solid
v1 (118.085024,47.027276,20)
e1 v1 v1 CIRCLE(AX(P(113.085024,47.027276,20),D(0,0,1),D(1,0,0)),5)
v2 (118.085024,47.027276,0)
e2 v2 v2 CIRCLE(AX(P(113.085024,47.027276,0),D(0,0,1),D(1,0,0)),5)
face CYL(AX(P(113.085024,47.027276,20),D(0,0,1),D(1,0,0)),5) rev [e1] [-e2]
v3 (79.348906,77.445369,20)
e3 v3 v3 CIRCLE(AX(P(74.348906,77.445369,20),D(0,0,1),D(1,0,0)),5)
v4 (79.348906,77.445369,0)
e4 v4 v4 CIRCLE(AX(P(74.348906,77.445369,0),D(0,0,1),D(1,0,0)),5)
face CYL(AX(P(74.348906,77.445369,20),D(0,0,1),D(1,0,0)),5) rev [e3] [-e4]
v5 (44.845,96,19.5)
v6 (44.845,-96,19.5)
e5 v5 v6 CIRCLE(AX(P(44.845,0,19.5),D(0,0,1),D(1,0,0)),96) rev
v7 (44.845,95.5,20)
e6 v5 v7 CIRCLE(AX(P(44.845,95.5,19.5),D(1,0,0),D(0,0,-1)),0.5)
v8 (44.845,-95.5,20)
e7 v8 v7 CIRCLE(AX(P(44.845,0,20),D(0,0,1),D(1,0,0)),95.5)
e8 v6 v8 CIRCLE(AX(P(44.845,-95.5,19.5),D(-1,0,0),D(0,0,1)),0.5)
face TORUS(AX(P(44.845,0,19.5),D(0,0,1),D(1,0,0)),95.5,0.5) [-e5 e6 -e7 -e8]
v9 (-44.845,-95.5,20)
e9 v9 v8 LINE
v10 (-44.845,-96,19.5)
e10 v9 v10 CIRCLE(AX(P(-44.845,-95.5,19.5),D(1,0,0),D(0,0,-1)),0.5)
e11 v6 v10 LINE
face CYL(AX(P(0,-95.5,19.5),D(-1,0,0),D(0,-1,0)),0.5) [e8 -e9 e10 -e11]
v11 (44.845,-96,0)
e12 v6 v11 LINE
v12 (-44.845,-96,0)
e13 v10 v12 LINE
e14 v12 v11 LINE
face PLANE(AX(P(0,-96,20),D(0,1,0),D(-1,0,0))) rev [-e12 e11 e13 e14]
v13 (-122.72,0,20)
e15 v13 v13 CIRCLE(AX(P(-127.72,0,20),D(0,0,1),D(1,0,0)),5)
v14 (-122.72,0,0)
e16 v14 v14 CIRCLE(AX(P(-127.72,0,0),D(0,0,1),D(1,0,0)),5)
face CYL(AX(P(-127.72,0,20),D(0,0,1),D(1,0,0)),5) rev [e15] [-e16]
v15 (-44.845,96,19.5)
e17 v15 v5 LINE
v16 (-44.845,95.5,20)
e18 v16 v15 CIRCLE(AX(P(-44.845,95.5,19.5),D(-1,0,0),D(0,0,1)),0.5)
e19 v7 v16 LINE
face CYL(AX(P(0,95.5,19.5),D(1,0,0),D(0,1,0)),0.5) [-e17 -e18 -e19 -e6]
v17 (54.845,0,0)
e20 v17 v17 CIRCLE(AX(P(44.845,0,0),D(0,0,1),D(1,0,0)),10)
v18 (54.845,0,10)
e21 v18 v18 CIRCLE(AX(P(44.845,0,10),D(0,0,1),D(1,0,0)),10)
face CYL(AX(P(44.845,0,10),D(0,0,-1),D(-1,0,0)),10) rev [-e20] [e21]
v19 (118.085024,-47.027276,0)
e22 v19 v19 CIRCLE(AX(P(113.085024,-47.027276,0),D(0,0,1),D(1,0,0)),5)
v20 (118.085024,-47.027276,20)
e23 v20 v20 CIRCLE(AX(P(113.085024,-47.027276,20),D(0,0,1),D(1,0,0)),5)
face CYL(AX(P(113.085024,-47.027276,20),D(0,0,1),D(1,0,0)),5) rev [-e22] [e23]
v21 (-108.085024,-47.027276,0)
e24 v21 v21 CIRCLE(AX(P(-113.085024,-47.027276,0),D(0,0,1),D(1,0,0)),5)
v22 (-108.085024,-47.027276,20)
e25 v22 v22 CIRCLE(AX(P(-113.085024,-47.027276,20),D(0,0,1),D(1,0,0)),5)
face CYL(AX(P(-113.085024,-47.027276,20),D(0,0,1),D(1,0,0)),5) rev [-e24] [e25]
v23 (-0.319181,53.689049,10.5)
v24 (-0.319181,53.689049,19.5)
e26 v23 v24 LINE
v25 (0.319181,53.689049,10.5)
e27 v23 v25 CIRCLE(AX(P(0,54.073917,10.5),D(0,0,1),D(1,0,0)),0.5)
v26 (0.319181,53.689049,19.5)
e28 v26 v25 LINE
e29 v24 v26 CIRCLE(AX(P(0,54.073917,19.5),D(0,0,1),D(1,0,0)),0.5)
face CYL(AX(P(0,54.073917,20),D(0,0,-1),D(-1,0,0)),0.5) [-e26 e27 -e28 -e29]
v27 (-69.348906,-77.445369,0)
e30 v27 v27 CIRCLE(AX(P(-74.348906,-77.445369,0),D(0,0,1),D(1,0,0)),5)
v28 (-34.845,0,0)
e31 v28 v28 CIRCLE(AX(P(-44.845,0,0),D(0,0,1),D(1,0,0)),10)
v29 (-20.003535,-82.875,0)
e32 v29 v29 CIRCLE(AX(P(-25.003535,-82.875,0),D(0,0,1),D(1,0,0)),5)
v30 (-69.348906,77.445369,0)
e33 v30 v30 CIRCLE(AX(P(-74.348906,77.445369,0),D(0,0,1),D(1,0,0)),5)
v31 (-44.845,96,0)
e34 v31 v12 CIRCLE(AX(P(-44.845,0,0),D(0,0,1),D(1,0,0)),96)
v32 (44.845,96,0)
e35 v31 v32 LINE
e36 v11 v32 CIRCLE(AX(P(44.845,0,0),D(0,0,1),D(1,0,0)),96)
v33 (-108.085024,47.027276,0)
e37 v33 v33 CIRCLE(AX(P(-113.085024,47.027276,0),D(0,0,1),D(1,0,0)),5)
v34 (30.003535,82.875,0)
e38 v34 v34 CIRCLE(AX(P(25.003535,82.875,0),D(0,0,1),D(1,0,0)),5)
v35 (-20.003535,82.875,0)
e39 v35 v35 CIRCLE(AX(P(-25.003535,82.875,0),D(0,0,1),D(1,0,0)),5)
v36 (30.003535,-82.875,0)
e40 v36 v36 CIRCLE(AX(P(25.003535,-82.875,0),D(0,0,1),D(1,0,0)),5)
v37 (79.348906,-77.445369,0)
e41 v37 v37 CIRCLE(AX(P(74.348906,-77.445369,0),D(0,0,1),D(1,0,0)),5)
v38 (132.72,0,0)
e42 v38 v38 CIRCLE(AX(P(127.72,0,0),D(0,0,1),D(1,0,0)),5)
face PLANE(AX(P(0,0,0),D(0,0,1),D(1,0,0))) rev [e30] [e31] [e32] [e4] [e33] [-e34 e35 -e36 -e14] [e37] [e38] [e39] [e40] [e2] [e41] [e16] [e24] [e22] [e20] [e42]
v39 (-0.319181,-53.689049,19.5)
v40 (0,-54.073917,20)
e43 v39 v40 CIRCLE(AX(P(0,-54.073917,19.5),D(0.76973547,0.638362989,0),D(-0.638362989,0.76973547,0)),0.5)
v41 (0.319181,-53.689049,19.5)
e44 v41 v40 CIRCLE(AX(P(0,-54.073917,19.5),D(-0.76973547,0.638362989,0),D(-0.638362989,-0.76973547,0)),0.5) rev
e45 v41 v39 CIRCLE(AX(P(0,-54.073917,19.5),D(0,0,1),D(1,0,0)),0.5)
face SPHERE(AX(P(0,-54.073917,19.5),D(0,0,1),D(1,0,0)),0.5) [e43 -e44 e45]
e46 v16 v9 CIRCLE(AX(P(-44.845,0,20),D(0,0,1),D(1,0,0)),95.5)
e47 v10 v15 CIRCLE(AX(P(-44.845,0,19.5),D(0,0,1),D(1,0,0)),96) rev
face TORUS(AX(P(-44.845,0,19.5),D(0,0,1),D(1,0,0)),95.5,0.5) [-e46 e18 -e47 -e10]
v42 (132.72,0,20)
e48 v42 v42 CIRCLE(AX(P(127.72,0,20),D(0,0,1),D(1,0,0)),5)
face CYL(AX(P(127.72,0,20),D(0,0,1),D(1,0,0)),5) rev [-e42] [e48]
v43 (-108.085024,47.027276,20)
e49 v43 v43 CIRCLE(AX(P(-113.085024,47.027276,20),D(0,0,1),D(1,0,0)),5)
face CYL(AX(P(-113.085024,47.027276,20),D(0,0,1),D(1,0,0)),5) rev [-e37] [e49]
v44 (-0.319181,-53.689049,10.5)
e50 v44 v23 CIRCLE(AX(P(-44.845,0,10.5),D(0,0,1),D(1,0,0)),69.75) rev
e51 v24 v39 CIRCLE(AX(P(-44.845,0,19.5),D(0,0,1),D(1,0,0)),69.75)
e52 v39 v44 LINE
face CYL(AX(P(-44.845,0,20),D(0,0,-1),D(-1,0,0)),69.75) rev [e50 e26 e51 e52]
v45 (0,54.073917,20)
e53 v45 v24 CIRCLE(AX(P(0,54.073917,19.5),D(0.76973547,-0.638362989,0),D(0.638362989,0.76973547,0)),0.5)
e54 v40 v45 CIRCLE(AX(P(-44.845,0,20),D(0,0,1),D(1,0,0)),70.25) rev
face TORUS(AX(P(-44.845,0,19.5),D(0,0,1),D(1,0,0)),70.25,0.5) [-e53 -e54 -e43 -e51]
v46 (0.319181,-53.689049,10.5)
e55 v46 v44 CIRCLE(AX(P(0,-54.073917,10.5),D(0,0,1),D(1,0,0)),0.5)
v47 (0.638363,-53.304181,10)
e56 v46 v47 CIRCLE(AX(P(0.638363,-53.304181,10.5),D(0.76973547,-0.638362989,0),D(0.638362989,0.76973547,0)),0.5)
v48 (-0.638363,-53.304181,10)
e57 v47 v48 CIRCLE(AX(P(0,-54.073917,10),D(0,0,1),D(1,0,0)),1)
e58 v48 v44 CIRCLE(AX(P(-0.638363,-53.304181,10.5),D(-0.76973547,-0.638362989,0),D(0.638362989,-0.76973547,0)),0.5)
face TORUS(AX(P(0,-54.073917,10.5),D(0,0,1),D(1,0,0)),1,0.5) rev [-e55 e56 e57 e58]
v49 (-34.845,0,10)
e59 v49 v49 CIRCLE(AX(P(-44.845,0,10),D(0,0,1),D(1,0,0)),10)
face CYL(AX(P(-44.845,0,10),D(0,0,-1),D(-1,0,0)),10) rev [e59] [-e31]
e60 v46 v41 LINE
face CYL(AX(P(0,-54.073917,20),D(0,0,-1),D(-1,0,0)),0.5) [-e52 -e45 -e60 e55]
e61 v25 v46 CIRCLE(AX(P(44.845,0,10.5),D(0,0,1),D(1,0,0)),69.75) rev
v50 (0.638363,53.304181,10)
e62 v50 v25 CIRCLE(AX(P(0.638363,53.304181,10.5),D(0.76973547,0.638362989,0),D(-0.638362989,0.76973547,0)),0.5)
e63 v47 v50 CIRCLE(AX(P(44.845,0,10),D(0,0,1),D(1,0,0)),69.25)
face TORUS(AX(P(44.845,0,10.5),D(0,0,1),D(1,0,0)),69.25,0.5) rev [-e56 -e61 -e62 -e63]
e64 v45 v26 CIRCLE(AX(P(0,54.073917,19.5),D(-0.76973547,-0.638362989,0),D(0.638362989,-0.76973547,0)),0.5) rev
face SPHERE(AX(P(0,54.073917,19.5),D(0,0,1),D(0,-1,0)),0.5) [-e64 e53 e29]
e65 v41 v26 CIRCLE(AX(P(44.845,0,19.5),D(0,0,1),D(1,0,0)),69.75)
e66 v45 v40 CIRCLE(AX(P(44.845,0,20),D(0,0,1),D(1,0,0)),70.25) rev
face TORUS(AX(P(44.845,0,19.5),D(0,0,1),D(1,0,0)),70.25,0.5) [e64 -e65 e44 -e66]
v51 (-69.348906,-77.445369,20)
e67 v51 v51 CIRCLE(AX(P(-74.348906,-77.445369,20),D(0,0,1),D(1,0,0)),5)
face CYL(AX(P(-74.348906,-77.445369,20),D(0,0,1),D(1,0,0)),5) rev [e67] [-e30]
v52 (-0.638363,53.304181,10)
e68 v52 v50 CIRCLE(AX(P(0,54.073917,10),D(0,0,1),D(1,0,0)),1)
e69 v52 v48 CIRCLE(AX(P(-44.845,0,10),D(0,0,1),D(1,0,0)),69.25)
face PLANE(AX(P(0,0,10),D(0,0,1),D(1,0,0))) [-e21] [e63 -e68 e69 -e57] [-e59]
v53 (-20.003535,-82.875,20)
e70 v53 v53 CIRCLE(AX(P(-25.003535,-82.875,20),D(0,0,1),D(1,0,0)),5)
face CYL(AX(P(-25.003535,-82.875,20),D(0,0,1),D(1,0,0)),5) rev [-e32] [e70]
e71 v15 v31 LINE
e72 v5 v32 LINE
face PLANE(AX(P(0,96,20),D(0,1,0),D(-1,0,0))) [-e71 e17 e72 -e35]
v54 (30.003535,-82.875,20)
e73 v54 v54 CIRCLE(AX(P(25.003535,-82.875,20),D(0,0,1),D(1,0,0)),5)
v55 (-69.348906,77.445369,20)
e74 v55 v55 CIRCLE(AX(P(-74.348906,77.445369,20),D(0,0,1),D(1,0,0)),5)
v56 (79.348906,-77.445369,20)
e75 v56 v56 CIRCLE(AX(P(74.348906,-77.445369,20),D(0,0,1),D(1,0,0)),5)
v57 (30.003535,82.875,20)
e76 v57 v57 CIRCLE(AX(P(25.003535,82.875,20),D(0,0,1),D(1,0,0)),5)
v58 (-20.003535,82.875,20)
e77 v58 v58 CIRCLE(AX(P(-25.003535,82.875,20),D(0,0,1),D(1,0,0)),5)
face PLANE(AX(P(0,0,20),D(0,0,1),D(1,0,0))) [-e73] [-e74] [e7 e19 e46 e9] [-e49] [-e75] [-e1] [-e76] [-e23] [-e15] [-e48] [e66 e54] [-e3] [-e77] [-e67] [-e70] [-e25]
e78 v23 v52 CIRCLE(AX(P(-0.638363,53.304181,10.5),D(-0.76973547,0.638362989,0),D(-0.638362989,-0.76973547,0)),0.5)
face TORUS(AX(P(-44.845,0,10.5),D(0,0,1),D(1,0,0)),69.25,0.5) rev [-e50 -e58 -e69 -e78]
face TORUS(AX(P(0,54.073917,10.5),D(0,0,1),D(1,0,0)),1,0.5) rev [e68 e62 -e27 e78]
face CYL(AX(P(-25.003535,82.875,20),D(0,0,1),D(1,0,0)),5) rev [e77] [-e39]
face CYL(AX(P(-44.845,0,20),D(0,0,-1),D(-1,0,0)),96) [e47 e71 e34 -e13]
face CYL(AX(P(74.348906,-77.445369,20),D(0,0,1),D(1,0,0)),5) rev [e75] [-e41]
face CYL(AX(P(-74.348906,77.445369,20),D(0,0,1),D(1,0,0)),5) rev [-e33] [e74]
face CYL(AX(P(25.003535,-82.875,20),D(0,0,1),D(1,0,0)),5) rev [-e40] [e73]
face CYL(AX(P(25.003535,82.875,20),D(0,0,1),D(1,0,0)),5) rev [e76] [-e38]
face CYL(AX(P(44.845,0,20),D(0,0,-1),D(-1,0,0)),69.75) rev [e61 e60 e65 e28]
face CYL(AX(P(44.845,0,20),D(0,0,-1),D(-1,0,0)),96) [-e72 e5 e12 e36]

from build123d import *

# Parameters (mm, degrees)
BOSS_EXTRUDE1_DEPTH   = 20
SKETCH1_3_R           = 10
BOSS_EXTRUDE2_DEPTH   = 10
F_1_0MM_DOWEL_HOLE1_D = 10
CRVPATTERN1_OUTLINE_R = 5
CRVPATTERN1_DEPTH     = 20
FILLET1_R             = 0.5


# Read off the part's stored shape, not the designer's step: CrvPattern1
with BuildPart() as part:
    # Sketch1 → Boss-Extrude1 (new body)
    with BuildSketch(Plane.XY):
        with BuildLine():
            Line((-44.845, -96), (44.845, -96))
            ThreePointArc((44.845, -96), (140.845, 0), (44.845, 96))
            Line((44.845, 96), (-44.845, 96))
            ThreePointArc((-44.845, 96), (-140.845, 0), (-44.845, -96))
        make_face()
        with BuildLine():
            ThreePointArc((0, -53.422733691), (114.595, 0), (0, 53.422733691))
            ThreePointArc((0, 53.422733691), (-114.595, 0), (0, -53.422733691))
        make_face(mode=Mode.SUBTRACT)
    extrude(amount=BOSS_EXTRUDE1_DEPTH)

    # Sketch1<3> → Boss-Extrude2 (add)
    with BuildSketch(Plane.XY):
        with BuildLine():
            ThreePointArc((0, 53.422733691), (-114.595, 0), (0, -53.422733691))
            ThreePointArc((0, -53.422733691), (114.595, 0), (0, 53.422733691))
        make_face()
        with Locations((44.845, 0)):
            Circle(SKETCH1_3_R, mode=Mode.SUBTRACT)
        with Locations((-44.845, 0)):
            Circle(SKETCH1_3_R, mode=Mode.SUBTRACT)
    extrude(amount=BOSS_EXTRUDE2_DEPTH)

    # Ø1.0mm Dowel Hole1 (through all)
    with Locations(Plane.XY.offset(20)):
        with Locations((127.72, 0)):
            Hole(F_1_0MM_DOWEL_HOLE1_D / 2)

    # CrvPattern1 outline → CrvPattern1 (cut)
    with BuildSketch(Plane.XY):
        with Locations((113.085024418, 47.027276047)):
            Circle(CRVPATTERN1_OUTLINE_R)
        with Locations((74.348906367, 77.445368707)):
            Circle(CRVPATTERN1_OUTLINE_R)
        with Locations((25.003535083, 82.875)):
            Circle(CRVPATTERN1_OUTLINE_R)
        with Locations((-25.003535083, 82.875)):
            Circle(CRVPATTERN1_OUTLINE_R)
        with Locations((-74.348906367, 77.445368707)):
            Circle(CRVPATTERN1_OUTLINE_R)
        with Locations((-113.085024418, 47.027276047)):
            Circle(CRVPATTERN1_OUTLINE_R)
        with Locations((-127.72, 0)):
            Circle(CRVPATTERN1_OUTLINE_R)
        with Locations((-113.085024418, -47.027276047)):
            Circle(CRVPATTERN1_OUTLINE_R)
        with Locations((-74.348906367, -77.445368707)):
            Circle(CRVPATTERN1_OUTLINE_R)
        with Locations((-25.003535083, -82.875)):
            Circle(CRVPATTERN1_OUTLINE_R)
        with Locations((25.003535083, -82.875)):
            Circle(CRVPATTERN1_OUTLINE_R)
        with Locations((74.348906367, -77.445368707)):
            Circle(CRVPATTERN1_OUTLINE_R)
        with Locations((113.085024418, -47.027276047)):
            Circle(CRVPATTERN1_OUTLINE_R)
    extrude(amount=CRVPATTERN1_DEPTH, mode=Mode.SUBTRACT)

    # Fillet1
    fillet1_edges = [part.edges().sort_by_distance(p)[0] for p in [
        (-114.595, 0, 20),
        (0, 53.422733691, 15),
        (0, -53.422733691, 15),
        (0, -96, 20),
        (140.845, 0, 20),
        (-114.595, 0, 10),
        (114.595, 0, 10),
        (0, 96, 20),
        (-140.845, 0, 20),
        (114.595, 0, 20),
    ]]
    fillet(fillet1_edges, radius=FILLET1_R)


solid = part.part
